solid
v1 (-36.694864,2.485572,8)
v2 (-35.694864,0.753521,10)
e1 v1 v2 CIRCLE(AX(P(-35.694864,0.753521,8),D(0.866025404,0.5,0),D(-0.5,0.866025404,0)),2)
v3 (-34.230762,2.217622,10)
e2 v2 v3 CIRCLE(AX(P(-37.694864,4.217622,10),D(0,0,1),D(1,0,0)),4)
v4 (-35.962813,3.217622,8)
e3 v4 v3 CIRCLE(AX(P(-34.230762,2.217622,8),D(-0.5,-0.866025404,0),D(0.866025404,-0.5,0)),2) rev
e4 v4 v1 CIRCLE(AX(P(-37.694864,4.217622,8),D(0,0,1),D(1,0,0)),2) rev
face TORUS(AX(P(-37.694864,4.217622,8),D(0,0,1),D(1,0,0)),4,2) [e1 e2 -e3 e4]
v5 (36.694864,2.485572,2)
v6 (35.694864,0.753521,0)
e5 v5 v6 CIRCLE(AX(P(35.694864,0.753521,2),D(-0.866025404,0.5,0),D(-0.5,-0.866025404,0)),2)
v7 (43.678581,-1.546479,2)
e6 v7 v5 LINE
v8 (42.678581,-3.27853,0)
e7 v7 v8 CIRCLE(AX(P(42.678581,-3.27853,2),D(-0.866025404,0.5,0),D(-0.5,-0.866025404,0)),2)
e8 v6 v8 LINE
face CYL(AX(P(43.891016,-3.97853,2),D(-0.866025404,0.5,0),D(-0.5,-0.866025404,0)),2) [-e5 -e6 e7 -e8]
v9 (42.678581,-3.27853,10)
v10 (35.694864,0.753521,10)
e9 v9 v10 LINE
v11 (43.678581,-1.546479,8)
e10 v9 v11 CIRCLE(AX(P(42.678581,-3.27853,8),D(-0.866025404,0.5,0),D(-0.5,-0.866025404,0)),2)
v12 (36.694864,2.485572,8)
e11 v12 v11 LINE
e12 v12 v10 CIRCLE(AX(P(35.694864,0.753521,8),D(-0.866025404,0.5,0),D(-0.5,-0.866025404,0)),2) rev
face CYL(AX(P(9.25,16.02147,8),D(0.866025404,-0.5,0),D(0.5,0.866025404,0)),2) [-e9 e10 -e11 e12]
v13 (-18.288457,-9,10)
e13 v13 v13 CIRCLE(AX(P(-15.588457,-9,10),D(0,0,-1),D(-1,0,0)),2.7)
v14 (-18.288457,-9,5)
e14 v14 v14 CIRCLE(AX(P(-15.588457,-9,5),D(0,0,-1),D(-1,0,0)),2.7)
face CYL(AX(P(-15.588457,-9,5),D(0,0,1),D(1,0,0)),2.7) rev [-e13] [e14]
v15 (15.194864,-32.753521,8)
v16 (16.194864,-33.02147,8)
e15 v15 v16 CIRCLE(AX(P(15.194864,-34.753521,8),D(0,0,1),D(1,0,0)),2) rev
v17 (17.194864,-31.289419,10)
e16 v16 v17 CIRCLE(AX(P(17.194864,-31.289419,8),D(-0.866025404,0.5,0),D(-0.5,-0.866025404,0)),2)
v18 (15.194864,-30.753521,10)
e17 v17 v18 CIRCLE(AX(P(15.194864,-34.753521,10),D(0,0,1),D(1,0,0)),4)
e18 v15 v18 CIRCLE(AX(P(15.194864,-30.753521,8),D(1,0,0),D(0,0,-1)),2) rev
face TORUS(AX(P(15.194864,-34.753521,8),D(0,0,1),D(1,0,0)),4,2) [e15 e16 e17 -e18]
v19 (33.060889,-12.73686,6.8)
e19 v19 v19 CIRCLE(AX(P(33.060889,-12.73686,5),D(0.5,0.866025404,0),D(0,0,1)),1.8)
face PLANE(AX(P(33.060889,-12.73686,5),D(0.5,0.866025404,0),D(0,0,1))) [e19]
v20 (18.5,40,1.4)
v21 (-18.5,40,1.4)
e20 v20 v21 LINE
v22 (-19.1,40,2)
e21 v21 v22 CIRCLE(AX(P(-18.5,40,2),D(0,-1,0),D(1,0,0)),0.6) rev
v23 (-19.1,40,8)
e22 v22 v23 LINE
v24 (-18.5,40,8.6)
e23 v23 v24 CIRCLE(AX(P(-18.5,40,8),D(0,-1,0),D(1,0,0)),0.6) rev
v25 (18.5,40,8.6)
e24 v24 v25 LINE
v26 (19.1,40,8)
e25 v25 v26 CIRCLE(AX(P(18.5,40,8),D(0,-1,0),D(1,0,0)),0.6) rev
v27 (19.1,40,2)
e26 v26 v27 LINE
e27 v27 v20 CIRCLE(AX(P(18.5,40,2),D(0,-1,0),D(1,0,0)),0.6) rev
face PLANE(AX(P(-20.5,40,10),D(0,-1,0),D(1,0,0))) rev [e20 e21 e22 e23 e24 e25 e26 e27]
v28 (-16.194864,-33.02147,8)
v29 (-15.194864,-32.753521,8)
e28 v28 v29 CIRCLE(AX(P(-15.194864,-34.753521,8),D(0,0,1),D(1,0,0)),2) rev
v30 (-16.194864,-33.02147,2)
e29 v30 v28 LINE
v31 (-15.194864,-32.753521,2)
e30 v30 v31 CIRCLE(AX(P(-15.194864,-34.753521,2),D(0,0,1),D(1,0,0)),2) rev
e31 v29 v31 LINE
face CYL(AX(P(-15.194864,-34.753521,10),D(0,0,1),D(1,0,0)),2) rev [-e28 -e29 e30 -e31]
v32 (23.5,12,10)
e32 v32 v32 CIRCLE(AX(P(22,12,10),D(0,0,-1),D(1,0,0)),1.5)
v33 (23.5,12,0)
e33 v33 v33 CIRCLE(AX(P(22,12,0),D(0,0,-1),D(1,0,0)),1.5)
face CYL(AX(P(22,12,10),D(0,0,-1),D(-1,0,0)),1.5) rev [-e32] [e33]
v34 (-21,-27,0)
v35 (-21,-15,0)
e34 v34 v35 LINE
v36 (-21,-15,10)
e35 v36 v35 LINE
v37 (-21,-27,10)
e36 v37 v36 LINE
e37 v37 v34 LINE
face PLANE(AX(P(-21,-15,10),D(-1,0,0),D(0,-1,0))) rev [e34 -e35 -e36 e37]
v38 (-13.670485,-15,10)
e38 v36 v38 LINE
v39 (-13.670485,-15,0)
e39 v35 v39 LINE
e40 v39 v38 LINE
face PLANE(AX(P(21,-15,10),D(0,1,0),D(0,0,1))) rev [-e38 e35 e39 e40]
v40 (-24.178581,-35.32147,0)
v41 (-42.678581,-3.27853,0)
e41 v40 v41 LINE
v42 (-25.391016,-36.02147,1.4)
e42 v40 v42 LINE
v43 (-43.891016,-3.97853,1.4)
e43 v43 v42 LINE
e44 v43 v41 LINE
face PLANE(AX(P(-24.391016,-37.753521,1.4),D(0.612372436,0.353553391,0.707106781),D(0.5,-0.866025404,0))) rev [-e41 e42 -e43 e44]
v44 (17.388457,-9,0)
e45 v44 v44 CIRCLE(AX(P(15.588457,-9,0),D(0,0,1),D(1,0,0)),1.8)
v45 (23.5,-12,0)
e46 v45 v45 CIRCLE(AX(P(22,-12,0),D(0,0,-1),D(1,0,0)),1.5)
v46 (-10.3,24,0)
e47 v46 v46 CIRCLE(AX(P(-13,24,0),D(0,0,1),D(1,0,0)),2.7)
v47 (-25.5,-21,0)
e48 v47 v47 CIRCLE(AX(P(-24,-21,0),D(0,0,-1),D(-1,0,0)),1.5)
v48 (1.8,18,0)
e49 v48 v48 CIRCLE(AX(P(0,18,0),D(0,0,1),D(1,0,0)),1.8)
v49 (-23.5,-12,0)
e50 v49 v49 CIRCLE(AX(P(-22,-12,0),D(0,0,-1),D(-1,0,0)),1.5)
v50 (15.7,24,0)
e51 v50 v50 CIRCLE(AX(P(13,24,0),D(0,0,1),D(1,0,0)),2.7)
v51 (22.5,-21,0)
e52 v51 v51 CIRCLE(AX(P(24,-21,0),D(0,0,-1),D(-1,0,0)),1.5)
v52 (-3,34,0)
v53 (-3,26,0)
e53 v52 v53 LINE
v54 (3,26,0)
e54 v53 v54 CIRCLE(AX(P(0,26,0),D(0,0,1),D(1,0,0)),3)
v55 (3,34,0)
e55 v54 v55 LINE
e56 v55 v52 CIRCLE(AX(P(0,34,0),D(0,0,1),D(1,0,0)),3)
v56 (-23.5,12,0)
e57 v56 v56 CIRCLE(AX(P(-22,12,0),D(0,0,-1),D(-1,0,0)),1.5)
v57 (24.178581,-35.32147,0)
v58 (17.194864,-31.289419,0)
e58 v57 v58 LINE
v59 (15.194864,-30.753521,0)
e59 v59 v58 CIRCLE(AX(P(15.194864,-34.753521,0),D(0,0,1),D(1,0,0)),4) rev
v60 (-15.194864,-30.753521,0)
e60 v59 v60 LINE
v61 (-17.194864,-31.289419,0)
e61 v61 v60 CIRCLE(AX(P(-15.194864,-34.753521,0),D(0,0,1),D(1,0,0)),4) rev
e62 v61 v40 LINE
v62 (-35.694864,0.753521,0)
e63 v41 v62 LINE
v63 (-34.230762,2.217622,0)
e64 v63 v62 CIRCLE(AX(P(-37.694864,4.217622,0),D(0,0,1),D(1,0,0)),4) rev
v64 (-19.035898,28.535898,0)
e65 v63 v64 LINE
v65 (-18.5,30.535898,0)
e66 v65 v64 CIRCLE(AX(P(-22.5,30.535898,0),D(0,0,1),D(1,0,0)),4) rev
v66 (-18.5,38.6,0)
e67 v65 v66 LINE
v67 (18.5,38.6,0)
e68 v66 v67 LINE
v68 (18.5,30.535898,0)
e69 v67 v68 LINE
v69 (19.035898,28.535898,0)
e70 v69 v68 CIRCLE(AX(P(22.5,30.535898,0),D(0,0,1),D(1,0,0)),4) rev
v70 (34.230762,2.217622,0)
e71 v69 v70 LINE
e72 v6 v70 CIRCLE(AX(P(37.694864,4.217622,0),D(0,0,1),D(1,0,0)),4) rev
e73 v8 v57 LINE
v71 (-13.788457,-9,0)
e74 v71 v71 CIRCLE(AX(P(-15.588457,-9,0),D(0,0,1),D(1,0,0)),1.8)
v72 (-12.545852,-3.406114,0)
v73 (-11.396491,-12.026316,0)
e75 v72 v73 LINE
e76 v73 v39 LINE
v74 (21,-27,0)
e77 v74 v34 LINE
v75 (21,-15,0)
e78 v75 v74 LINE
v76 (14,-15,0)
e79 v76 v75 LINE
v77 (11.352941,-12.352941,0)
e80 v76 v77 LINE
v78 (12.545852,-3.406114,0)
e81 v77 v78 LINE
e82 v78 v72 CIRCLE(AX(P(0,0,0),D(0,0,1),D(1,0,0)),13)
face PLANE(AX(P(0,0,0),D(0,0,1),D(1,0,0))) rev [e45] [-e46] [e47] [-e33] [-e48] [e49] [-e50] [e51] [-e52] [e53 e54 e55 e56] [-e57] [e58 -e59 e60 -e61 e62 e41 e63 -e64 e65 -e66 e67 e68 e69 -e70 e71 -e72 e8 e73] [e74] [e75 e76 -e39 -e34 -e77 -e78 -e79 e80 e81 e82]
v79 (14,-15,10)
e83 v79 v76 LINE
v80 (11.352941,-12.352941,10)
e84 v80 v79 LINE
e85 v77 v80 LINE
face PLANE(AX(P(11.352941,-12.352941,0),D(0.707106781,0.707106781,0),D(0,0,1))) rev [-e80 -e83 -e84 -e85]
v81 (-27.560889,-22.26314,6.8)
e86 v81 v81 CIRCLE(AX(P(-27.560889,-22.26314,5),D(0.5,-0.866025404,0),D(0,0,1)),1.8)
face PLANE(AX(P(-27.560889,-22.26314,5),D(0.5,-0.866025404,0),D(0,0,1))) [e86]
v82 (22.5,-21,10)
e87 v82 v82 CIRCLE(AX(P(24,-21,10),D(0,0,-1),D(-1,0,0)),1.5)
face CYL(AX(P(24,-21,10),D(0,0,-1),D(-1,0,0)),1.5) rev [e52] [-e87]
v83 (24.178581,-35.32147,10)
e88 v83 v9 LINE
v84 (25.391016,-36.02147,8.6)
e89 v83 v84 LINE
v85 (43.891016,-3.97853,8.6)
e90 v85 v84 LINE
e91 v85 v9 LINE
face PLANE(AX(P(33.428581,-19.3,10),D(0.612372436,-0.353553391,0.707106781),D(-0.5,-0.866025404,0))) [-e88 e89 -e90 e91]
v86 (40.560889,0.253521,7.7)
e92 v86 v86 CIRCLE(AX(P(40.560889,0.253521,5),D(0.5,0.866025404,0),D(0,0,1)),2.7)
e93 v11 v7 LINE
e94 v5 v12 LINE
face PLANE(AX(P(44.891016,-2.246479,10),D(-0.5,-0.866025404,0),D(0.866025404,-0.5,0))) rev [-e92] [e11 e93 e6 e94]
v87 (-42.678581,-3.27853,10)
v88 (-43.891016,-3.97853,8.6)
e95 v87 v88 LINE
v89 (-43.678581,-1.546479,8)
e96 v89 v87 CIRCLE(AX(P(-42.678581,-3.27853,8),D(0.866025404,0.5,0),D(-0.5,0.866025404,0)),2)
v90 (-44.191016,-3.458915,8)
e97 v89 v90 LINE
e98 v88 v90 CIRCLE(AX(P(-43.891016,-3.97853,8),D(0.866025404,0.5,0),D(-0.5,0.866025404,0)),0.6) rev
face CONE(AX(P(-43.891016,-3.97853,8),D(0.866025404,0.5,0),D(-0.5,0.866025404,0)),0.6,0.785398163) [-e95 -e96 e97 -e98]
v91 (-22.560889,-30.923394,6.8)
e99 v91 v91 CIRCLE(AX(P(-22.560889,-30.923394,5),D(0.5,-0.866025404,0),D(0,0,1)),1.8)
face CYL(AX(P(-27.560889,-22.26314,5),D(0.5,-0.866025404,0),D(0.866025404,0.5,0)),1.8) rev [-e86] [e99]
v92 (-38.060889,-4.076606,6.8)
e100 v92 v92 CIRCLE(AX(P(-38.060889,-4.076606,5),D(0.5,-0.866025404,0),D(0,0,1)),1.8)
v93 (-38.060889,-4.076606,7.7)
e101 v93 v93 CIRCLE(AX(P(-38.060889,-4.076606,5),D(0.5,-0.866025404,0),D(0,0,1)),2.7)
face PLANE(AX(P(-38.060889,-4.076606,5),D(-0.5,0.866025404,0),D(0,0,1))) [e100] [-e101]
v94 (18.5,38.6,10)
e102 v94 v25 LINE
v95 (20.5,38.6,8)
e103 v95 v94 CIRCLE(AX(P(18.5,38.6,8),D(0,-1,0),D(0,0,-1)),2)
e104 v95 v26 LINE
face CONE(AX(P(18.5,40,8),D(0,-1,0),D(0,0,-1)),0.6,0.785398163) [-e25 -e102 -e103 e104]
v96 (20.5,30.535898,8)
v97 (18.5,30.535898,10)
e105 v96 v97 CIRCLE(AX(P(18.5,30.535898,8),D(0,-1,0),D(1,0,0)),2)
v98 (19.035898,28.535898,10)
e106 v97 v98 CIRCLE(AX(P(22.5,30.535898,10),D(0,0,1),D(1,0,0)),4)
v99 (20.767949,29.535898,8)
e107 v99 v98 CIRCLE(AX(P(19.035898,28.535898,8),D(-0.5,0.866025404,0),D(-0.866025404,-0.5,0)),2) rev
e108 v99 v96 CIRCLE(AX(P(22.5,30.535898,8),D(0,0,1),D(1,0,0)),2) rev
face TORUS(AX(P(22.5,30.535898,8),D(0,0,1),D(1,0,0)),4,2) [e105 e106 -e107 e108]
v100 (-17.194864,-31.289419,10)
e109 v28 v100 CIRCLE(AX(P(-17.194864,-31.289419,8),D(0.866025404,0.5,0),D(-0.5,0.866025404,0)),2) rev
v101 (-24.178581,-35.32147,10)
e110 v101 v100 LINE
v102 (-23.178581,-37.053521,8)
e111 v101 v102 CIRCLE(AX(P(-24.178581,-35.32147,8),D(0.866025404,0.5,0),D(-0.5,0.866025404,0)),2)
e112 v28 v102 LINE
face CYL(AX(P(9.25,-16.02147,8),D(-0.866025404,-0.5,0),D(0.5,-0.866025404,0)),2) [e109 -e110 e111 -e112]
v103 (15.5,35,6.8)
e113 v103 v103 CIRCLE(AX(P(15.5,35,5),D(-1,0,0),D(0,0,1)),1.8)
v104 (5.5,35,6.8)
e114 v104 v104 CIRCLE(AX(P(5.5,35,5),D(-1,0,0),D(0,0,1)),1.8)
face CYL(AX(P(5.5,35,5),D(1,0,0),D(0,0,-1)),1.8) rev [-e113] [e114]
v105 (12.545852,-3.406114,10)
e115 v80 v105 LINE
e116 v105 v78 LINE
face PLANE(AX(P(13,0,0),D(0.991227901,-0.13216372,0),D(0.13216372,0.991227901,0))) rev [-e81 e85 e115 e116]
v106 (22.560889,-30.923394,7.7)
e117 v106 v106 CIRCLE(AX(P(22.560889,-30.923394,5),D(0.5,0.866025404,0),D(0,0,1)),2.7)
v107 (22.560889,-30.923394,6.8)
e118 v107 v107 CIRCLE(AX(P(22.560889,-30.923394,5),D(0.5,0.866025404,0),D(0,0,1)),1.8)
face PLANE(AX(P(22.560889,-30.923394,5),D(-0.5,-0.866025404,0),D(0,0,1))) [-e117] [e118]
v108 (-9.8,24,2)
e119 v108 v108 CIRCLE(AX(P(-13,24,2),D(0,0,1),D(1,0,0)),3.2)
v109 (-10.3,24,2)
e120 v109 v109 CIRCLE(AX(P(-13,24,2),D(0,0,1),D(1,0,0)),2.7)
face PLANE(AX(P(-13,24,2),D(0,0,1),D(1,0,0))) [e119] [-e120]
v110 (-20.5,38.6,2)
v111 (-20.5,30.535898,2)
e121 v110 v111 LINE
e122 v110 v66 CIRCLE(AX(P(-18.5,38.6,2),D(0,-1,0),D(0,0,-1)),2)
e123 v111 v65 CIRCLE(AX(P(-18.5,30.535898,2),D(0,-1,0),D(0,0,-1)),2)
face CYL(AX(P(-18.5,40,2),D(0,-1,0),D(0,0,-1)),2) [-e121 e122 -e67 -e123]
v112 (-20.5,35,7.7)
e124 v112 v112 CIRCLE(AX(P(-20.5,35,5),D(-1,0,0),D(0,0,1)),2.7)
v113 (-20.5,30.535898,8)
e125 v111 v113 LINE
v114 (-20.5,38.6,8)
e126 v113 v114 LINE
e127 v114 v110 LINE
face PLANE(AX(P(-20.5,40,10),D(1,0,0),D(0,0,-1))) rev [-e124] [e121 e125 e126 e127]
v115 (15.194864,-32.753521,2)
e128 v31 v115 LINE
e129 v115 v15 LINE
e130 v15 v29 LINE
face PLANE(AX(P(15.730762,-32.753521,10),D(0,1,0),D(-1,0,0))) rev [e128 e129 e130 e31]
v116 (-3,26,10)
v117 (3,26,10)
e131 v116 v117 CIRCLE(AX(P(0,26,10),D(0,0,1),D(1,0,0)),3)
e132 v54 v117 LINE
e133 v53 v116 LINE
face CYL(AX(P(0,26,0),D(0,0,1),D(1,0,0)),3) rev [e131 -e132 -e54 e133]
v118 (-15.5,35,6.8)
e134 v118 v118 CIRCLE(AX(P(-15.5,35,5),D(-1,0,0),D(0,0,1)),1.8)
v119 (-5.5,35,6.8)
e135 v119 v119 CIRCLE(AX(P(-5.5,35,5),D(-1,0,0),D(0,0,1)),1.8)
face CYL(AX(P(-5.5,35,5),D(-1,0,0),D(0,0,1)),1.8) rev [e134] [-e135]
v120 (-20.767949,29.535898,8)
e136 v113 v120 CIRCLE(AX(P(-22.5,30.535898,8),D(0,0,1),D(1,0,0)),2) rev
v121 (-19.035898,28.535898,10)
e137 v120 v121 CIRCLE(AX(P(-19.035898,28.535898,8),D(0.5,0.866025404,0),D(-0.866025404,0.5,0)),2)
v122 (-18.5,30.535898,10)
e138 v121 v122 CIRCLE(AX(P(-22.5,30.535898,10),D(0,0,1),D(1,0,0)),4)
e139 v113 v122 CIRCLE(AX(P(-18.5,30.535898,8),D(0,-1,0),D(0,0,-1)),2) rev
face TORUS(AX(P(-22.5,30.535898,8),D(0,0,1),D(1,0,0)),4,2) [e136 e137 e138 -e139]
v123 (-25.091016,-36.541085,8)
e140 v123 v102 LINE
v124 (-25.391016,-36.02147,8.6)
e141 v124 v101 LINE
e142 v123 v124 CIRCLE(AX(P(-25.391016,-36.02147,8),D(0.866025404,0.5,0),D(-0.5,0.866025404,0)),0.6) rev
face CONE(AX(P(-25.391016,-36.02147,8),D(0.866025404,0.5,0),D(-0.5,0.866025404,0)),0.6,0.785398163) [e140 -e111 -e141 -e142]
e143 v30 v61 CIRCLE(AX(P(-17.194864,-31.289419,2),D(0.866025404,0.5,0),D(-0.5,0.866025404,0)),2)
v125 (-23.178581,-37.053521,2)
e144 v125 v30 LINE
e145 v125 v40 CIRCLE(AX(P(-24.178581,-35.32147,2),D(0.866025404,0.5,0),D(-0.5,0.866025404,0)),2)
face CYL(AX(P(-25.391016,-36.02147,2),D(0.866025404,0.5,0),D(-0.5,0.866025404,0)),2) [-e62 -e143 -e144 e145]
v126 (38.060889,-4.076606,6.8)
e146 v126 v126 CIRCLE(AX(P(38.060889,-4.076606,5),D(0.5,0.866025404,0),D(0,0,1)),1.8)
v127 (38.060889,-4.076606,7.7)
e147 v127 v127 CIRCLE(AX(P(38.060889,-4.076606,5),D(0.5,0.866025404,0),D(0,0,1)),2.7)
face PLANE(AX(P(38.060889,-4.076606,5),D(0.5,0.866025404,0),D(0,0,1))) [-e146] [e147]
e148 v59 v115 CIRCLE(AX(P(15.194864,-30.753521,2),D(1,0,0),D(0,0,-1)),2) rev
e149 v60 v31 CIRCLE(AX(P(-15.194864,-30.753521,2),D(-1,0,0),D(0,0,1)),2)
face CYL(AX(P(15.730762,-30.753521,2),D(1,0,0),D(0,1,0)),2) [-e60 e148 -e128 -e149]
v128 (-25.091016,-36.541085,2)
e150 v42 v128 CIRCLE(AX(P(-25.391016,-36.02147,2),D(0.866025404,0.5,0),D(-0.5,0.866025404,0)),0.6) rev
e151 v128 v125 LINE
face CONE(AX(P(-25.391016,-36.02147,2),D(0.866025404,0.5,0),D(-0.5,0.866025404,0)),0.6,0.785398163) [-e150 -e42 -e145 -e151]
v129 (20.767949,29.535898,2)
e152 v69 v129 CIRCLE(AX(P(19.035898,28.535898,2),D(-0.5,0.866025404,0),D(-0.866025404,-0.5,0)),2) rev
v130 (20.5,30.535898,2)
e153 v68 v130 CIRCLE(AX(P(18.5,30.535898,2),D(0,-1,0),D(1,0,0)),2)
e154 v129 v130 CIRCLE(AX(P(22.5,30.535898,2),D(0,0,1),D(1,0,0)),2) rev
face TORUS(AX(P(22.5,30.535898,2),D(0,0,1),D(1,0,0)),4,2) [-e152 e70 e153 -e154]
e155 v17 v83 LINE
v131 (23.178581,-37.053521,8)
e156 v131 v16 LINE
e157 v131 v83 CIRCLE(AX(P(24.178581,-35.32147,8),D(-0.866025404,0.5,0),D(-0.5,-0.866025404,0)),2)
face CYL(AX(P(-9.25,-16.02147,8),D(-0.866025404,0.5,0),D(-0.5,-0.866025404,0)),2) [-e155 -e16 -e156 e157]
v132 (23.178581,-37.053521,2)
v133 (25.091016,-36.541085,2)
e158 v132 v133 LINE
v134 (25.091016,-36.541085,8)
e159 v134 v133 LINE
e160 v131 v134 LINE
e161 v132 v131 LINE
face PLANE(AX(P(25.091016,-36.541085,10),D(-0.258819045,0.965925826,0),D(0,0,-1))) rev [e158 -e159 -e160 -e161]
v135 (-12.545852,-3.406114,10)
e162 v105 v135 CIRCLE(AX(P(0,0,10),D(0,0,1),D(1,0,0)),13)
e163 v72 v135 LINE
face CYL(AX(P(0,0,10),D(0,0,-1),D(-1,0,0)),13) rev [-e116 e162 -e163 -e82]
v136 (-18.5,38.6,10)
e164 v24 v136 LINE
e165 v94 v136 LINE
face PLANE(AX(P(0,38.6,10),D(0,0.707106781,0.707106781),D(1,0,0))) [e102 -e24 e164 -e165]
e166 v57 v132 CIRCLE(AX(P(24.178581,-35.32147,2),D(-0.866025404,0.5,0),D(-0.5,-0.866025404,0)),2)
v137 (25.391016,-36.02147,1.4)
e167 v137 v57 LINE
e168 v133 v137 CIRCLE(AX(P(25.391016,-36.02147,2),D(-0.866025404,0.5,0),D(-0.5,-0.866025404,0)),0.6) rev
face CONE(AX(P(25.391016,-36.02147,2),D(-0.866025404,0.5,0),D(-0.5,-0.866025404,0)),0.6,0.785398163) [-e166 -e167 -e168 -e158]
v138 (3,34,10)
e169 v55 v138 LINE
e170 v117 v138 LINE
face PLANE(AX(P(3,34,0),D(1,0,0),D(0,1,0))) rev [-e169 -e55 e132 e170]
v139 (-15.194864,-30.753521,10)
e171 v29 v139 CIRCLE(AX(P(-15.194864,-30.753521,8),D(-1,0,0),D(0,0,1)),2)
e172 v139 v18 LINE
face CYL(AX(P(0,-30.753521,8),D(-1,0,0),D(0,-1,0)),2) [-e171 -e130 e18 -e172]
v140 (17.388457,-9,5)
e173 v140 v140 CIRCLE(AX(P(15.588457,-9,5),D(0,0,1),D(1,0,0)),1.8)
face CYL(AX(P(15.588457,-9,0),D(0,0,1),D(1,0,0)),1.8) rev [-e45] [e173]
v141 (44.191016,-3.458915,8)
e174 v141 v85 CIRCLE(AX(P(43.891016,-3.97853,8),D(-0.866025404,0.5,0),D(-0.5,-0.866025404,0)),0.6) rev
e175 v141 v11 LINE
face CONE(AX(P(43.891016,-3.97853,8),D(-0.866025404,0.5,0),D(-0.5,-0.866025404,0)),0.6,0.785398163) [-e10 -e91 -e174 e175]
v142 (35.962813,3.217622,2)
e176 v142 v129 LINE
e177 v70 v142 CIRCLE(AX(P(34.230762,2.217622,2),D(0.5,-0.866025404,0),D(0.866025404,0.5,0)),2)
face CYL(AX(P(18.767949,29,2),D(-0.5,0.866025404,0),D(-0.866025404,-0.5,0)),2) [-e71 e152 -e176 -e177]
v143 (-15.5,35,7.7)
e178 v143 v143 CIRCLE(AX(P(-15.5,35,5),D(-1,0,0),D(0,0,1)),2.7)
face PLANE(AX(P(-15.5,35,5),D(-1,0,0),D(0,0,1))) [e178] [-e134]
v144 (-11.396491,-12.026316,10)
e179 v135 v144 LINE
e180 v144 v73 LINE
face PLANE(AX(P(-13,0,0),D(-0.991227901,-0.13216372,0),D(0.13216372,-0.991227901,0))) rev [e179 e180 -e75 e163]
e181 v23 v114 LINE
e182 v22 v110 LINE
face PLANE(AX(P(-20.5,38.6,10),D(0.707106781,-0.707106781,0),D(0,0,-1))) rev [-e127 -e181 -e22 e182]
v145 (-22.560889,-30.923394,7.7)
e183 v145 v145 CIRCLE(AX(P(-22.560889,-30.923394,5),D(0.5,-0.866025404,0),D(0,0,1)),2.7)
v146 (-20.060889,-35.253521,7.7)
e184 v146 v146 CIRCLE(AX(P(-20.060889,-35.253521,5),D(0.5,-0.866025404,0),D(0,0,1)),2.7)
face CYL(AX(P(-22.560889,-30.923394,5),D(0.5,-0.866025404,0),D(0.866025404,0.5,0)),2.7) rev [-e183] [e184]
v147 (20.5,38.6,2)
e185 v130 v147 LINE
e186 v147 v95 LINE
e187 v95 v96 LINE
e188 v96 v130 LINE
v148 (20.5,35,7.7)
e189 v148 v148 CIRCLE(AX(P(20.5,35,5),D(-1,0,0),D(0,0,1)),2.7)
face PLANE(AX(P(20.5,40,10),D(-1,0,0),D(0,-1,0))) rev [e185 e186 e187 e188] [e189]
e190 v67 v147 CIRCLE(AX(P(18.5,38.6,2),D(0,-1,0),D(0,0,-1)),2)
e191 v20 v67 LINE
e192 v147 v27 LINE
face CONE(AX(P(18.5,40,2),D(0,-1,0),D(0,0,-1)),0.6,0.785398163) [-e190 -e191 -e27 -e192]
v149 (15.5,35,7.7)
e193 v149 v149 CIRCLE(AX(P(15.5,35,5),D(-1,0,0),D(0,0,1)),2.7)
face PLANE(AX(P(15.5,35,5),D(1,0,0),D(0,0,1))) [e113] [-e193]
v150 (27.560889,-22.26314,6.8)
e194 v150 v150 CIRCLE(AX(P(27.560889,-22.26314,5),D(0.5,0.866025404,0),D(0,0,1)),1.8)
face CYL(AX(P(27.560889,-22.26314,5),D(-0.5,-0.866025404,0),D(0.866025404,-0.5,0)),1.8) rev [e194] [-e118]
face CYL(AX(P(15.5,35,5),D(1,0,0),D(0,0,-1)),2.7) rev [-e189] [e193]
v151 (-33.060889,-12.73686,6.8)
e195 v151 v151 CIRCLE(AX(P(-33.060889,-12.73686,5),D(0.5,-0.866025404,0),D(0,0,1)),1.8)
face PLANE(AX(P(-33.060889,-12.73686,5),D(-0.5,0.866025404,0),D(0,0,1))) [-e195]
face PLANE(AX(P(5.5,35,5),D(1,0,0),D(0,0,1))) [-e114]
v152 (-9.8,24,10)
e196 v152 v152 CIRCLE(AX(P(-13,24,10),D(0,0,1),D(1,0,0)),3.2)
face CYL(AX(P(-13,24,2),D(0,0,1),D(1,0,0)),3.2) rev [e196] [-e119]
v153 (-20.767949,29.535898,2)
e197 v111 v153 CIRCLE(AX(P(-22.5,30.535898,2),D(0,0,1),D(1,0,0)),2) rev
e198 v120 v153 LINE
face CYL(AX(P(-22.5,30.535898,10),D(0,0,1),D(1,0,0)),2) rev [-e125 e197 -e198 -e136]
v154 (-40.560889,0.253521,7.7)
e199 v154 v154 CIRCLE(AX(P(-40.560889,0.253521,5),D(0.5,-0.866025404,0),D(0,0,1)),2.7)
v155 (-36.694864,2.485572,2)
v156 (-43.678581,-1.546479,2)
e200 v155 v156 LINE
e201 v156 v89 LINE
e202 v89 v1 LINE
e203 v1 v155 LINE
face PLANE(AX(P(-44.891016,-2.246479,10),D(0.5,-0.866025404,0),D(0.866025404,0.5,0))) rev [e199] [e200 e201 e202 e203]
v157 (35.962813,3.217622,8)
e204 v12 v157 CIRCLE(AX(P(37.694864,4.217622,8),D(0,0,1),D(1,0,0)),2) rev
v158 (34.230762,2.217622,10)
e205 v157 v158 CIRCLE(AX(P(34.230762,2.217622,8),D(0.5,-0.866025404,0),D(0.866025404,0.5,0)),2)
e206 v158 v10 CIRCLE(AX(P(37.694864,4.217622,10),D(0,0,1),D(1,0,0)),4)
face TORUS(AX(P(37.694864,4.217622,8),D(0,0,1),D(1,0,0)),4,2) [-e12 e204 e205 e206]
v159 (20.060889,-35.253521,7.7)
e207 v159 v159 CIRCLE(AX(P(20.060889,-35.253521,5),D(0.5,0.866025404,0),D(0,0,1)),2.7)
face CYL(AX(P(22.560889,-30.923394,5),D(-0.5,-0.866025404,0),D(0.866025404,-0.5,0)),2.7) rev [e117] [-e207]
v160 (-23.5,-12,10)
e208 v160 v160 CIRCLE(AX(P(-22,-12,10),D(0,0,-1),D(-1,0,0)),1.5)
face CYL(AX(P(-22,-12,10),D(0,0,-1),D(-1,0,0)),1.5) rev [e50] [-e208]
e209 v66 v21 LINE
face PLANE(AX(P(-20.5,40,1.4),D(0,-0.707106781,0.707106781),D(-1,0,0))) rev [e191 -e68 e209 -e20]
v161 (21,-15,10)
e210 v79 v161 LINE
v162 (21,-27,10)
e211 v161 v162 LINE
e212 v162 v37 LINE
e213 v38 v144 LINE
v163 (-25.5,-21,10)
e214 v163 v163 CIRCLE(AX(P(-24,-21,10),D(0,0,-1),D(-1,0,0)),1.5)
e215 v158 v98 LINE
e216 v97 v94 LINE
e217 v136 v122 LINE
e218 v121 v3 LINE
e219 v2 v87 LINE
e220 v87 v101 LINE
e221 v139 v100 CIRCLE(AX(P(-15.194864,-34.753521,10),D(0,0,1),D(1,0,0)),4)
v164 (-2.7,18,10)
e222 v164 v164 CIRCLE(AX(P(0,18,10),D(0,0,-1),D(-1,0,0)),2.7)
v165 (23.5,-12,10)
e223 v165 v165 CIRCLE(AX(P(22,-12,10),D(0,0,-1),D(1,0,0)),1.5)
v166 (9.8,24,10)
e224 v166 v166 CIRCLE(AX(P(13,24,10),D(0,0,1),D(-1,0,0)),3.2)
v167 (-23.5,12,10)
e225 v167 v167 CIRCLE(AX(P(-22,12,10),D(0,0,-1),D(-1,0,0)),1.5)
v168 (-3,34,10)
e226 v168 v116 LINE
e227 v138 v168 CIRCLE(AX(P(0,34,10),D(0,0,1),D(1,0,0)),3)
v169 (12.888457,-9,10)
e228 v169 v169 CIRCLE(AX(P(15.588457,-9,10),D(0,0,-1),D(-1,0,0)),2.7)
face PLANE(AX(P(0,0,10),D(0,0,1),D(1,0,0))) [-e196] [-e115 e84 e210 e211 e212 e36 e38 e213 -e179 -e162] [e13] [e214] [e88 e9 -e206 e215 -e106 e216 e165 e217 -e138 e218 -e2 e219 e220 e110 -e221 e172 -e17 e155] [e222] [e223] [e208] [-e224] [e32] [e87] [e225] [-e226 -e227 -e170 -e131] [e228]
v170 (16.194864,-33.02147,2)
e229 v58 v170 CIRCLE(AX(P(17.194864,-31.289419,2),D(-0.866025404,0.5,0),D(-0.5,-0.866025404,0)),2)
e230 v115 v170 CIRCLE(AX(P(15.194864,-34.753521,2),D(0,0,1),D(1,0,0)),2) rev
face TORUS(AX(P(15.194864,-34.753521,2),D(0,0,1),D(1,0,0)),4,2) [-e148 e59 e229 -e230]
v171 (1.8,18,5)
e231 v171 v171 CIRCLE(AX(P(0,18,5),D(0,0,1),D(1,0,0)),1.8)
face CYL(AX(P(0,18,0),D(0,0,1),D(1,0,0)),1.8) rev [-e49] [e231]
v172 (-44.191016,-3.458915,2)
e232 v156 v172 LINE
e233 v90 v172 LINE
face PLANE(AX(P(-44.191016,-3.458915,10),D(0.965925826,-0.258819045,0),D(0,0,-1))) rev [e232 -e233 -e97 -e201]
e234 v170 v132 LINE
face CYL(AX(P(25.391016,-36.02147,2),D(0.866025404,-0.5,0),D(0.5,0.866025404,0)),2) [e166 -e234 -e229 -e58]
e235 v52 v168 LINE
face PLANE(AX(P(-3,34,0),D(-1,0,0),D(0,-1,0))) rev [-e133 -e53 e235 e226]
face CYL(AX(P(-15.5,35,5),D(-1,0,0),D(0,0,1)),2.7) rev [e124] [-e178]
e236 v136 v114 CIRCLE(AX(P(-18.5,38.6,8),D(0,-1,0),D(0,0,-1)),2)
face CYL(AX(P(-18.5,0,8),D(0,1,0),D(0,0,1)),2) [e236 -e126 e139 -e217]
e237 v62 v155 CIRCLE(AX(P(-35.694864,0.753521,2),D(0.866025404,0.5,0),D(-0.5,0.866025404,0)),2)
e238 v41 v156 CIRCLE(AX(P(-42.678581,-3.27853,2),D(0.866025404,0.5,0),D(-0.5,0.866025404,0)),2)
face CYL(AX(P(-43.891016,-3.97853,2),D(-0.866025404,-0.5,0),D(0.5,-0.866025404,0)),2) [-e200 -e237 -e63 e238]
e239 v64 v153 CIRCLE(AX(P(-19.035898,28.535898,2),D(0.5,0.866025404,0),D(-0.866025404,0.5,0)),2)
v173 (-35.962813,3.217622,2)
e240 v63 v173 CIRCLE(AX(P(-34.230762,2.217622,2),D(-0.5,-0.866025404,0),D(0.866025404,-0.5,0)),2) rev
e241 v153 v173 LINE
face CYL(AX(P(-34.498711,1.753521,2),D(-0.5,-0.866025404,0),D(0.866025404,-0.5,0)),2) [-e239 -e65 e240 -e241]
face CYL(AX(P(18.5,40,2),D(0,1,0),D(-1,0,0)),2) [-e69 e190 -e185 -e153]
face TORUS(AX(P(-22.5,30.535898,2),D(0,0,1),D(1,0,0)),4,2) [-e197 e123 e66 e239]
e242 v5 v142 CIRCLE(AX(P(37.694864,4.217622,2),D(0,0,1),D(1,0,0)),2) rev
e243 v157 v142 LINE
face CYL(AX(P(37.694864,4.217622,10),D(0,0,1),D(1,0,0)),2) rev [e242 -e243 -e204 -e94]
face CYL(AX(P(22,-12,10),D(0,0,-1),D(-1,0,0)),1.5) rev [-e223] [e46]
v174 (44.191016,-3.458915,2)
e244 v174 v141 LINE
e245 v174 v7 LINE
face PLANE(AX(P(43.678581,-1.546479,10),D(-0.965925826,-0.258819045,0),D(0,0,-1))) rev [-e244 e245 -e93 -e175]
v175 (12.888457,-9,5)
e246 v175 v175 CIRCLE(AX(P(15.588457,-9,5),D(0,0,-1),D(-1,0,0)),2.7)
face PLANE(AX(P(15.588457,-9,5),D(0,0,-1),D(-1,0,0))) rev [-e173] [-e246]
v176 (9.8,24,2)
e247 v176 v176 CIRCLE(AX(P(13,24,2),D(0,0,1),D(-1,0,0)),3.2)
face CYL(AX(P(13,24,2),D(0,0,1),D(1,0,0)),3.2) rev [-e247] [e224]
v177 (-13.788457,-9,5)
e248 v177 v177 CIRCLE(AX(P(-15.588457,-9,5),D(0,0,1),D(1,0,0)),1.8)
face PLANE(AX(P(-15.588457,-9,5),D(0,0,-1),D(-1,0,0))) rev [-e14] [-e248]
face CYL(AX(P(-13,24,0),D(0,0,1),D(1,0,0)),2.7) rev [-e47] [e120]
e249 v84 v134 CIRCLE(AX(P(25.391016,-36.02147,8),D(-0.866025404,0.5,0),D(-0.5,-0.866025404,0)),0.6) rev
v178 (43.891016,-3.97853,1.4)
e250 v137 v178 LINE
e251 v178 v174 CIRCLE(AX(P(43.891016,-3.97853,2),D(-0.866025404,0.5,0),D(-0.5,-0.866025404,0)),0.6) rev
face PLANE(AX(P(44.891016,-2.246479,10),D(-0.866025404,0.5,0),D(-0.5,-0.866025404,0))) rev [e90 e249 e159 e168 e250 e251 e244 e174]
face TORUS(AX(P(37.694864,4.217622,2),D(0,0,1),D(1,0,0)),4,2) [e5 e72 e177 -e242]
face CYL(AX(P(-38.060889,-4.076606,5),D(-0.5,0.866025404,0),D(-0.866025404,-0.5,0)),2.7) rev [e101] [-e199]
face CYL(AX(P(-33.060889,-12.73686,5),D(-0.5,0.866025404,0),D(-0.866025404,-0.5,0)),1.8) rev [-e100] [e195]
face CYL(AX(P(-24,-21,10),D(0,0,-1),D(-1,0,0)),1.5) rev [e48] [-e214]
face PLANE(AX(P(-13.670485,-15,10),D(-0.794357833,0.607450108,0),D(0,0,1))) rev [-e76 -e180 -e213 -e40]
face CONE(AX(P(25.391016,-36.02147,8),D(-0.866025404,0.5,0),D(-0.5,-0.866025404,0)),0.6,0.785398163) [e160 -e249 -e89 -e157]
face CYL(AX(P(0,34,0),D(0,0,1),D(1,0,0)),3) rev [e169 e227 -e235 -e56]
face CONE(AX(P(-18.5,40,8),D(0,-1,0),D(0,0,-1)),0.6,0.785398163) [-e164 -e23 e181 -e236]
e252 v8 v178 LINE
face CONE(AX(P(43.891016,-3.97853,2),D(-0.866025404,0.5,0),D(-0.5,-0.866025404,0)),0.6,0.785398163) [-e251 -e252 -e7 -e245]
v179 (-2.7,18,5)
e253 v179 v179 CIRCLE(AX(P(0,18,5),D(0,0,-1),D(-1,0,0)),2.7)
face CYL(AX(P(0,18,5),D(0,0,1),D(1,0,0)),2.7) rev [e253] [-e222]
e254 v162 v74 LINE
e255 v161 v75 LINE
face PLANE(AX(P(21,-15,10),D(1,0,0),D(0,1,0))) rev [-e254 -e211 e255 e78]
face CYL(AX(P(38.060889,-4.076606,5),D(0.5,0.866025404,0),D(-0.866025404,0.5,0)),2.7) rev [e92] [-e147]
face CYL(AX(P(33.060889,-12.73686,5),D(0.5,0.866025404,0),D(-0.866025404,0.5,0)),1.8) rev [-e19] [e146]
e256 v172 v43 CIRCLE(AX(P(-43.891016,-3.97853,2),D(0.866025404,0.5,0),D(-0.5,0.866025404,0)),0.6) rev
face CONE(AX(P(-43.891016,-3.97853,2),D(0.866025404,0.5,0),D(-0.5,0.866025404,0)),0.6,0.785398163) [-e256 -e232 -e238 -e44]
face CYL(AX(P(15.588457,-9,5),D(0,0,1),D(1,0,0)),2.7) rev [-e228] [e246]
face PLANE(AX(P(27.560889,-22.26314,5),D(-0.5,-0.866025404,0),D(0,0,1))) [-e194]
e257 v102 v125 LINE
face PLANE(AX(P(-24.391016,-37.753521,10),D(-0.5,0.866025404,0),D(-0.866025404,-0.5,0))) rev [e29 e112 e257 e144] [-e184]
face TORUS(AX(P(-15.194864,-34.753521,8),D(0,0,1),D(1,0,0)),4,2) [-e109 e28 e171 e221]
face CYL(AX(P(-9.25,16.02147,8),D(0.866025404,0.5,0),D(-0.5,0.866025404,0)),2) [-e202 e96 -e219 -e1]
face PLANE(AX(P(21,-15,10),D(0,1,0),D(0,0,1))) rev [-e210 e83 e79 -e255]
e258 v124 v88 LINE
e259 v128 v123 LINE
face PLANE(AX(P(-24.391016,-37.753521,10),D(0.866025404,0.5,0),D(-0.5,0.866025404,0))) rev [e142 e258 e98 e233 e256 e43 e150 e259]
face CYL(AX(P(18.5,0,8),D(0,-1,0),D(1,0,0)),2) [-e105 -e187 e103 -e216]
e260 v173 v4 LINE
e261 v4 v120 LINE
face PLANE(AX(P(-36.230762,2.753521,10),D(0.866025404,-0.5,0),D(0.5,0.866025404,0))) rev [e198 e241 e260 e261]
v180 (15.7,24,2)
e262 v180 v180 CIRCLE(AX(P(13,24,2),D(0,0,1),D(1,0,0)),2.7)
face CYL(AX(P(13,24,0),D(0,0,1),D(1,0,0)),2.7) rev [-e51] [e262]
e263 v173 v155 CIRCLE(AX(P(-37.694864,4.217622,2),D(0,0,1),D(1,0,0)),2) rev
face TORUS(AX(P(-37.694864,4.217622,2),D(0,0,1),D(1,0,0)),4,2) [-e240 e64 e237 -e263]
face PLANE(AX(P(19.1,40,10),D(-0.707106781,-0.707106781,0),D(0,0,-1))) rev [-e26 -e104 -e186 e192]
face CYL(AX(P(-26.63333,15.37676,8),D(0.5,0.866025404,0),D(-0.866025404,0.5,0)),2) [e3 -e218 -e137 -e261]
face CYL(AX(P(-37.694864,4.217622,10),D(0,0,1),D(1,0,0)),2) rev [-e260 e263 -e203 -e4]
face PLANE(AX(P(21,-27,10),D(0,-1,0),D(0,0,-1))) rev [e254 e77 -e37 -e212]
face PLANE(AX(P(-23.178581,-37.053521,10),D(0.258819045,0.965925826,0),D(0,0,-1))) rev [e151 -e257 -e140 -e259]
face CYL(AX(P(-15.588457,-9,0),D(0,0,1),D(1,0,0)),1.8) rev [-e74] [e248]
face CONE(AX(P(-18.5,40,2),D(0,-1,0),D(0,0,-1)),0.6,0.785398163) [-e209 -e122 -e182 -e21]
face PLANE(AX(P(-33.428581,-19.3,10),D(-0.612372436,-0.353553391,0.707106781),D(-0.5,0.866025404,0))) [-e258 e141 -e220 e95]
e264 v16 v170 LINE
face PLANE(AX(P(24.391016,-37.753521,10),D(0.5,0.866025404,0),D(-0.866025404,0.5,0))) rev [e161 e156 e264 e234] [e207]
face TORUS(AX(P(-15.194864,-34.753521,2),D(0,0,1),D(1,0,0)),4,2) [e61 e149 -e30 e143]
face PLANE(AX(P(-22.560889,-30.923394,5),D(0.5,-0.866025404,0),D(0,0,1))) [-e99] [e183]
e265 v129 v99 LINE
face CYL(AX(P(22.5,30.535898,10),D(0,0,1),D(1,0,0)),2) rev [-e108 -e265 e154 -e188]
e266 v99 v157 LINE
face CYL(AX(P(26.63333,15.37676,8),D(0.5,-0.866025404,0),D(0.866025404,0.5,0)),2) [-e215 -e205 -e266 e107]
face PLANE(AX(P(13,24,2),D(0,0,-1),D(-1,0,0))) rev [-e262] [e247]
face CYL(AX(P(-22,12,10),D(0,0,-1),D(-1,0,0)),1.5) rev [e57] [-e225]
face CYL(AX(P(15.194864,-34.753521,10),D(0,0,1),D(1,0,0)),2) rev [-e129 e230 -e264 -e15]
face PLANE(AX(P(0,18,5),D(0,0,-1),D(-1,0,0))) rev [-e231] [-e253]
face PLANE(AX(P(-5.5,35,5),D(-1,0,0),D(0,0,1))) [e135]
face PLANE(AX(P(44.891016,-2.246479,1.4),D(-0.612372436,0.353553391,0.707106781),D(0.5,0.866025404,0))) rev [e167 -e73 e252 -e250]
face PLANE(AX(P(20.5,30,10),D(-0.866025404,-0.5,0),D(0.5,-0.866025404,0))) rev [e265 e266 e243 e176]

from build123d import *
from OCP.BRepFilletAPI import BRepFilletAPI_MakeChamfer

# Parameters (mm, degrees)
SKETCH_1_R                         = 13
EXTRUDE_1_DEPTH                    = 10
SKETCH_2_R                         = 2.7
CUT_EXTRUDE_1_DEPTH                = 5
PATTERN_CIRCULAR_1_COUNT           = 3
PATTERN_CIRCULAR_1_COPY_1_SKETCH_R = 2.7
PATTERN_CIRCULAR_1_COPY_1_DEPTH    = 5
PATTERN_CIRCULAR_1_COPY_2_SKETCH_R = 2.7
PATTERN_CIRCULAR_1_COPY_2_DEPTH    = 5
SKETCH_3_R                         = 2.7
SKETCH_3_R_2                       = 2.699999999999997
SKETCH_3_R_3                       = 2.700000000000001
CUT_EXTRUDE_2_DEPTH                = 5
SKETCH_4_R                         = 1.5000000000000009
SKETCH_4_R_2                       = 1.5000000000000042
CUT_EXTRUDE_3_DEPTH                = 61.95246780158357
CUT_EXTRUDE_5_DEPTH                = 61.95246780158357
SKETCH_7_R                         = 3.2
SKETCH_7_R_2                       = 3.1999999999999984
CUT_EXTRUDE_6_DEPTH                = 8
CHAMFER_2_SIZE                     = 1.4
FILLET_2_R                         = 2
CHAMFER_3_SIZE                     = 1.4
SKETCH_9_R                         = 1.8000000000000005
SKETCH_9_R_2                       = 1.7999999999999987
SKETCH_9_R_3                       = 1.8
CUT_EXTRUDE_8_DEPTH                = 60.81513460321006
SKETCH_10_R                        = 1.8000000000000014
CUT_EXTRUDE_9_DEPTH                = 10
PATTERN_CIRCULAR_2_COUNT           = 3
PATTERN_CIRCULAR_2_COPY_1_SKETCH_R = 1.8000000000000014
PATTERN_CIRCULAR_2_COPY_1_DEPTH    = 10
PATTERN_CIRCULAR_2_COPY_2_SKETCH_R = 1.8000000000000014
PATTERN_CIRCULAR_2_COPY_2_DEPTH    = 10
SKETCH_11_R                        = 1.5000000000000009
CUT_EXTRUDE_10_DEPTH               = 61.43881474350847
SKETCH_12_R                        = 2.6999999999999993
CUT_EXTRUDE_11_DEPTH               = 61.140255466701646
CUT_EXTRUDE_12_DEPTH               = 61.43881474350847
CHAMFER_4_SIZE                     = 3
CHAMFER_4_SIZE2                    = 2.6704845794861627
CHAMFER_4_SIZE2_2                  = 2.670484579486165


with BuildPart() as part:
    # 草圖1 → 填料-伸長1 (new body)
    with BuildSketch(Plane.XY):
        Polygon((-20.49999999999998, 39.999999999999986), (20.49999999999997, 39.99999999999999), (20.499999999999982, 29.999999999999993), (36.23076211353136, 2.753520777584056), (44.891016151375794, -2.2464792224159686), (24.39101615137583, -37.753520777577926), (15.730762113531437, -32.75352077757793), (-15.730762113531332, -32.753520777577926), (-24.391016151375762, -37.75352077757796), (-44.891016151375766, -2.2464792224160335), (-36.23076211353138, 2.7535207775839847), (-20.49999999999998, 29.999999999999936), align=None)
        Circle(SKETCH_1_R, mode=Mode.SUBTRACT)
    extrude(amount=EXTRUDE_1_DEPTH)

    # 草圖2 → 除料-伸長1 (cut)
    with BuildSketch(Plane.ZY.offset(20.49999999999998)):
        with Locations((5, 34.999999999999964)):
            Circle(SKETCH_2_R)
    cut_extrude_1 = extrude(amount=-CUT_EXTRUDE_1_DEPTH, mode=Mode.SUBTRACT)

    # 鏡射1: 除料-伸長1 across plane
    add(cut_extrude_1.mirror(Plane(origin=(0, 0, 0), x_dir=(0, 0, 1), z_dir=(1, 0, 0))), mode=Mode.SUBTRACT)

    # 環狀複製排列1: 除料-伸長1 ×3 about axis
    pattern_circular_1_axis = Axis((1.45e-15, -5e-16, 0), (0, 0, 1))
    for i in range(1, PATTERN_CIRCULAR_1_COUNT):
        add(cut_extrude_1.rotate(pattern_circular_1_axis, i * 360 / PATTERN_CIRCULAR_1_COUNT), mode=Mode.SUBTRACT)

    # 環狀複製排列1 copy 1 sketch → 環狀複製排列1 copy 1 (cut)
    with BuildSketch(Plane(origin=(-10.249999999999982, 17.75352077758097, 0), x_dir=(0, 0, 1), z_dir=(-0.4999999999999998, 0.8660254037844387, 0))):
        with Locations((5, -34.999999999999964)):
            Circle(PATTERN_CIRCULAR_1_COPY_1_SKETCH_R)
    extrude(amount=-PATTERN_CIRCULAR_1_COPY_1_DEPTH, mode=Mode.SUBTRACT)

    # 環狀複製排列1 copy 2 sketch → 環狀複製排列1 copy 2 (cut)
    with BuildSketch(Plane(origin=(-10.249999999999996, -17.753520777580967, 0), x_dir=(0, 0, 1), z_dir=(-0.5000000000000004, -0.8660254037844384, 0))):
        with Locations((5, -34.999999999999964)):
            Circle(PATTERN_CIRCULAR_1_COPY_2_SKETCH_R)
    extrude(amount=-PATTERN_CIRCULAR_1_COPY_2_DEPTH, mode=Mode.SUBTRACT)

    # 草圖3 → 除料-伸長2 (cut)
    with BuildSketch(Plane(origin=(0, 0, 10), x_dir=(-1, 0, 0), z_dir=(0, 0, -1))):
        with Locations((2.04439e-12, 18)):
            Circle(SKETCH_3_R)
        with Locations((15.588457268121106, -9.000000000000483)):
            Circle(SKETCH_3_R_2)
        with Locations((-15.588457268118686, -8.999999999999522)):
            Circle(SKETCH_3_R_3)
    extrude(amount=CUT_EXTRUDE_2_DEPTH, mode=Mode.SUBTRACT)

    # 草圖4 → 除料-伸長3 (cut, through all)
    with BuildSketch(Plane(origin=(0, 0, 0), x_dir=(-1, 0, 0), z_dir=(0, 0, -1))):
        with Locations((22, -12)):
            Circle(SKETCH_4_R)
        with Locations((21.999999999999986, 12.000000000000002)):
            Circle(SKETCH_4_R)
        with Locations(Location((-21.999999999999986, 12.000000000000002, 0), (0, 0, 180))):
            Circle(SKETCH_4_R_2)
        with Locations(Location((-22, -12, 0), (0, 0, 180))):
            Circle(SKETCH_4_R)
    extrude(amount=-CUT_EXTRUDE_3_DEPTH, mode=Mode.SUBTRACT)

    # 草圖6 → 除料-伸長5 (cut, through all)
    with BuildSketch(Plane.XY.offset(10)):
        with BuildLine():
            Line((3, 34), (3.0000000000000013, 26))
            ThreePointArc((3.0000000000000013, 26), (1.8e-16, 23), (-2.9999999999999996, 26))
            Line((-2.9999999999999996, 26), (-3.000000000000001, 34))
            ThreePointArc((-3.000000000000001, 34), (-6e-17, 37), (3, 34))
        make_face()
    extrude(amount=-CUT_EXTRUDE_5_DEPTH, mode=Mode.SUBTRACT)

    # 草圖7 → 除料-伸長6 (cut)
    with BuildSketch(Plane.XY.offset(10)):
        with Locations((-13.000000000000004, 24)):
            Circle(SKETCH_7_R)
        with Locations(Location((12.999999999999996, 24.000000000000004, 0), (0, 0, 180))):
            Circle(SKETCH_7_R_2)
    extrude(amount=-CUT_EXTRUDE_6_DEPTH, mode=Mode.SUBTRACT)

    # 導角2
    chamfer_2_edges = [part.edges().sort_by_distance(p)[0] for p in [
        (-34.641016151375766, -19.999999999996998, 10),
        (-3.55e-15, 39.999999999999986, 0),
        (34.64101615137581, -19.999999999996945, 0),
        (-34.641016151375766, -19.999999999996998, 0),
        (34.64101615137581, -19.999999999996945, 10),
        (-3.55e-15, 39.999999999999986, 10),
    ]]
    chamfer(chamfer_2_edges, length=CHAMFER_2_SIZE)

    # 圓角2
    fillet_2_edges = [part.edges().sort_by_distance(p)[0] for p in [
        (39.95467134980447, 0.6035207775840439, 10),
        (39.95467134980447, 0.6035207775840439, 0),
        (20.49999999999998, 34.3, 10),
        (20.49999999999998, 34.29999999999999, 0),
        (-20.49999999999998, 34.29999999999996, 10),
        (-20.49999999999998, 34.29999999999996, 0),
        (-39.95467134980447, 0.6035207775839742, 10),
        (-39.95467134980447, 0.603520777583975, 0),
        (-19.454671349804443, -34.903520777577945, 10),
        (-19.454671349804443, -34.903520777577945, 0),
        (19.45467134980452, -34.903520777577924, 10),
        (19.45467134980452, -34.903520777577924, 0),
        (36.23076211353136, 2.753520777584056, 5),
        (28.36538105676567, 16.376760388792025, 10),
        (20.499999999999982, 29.999999999999993, 5),
        (28.36538105676567, 16.376760388792025, 0),
        (-20.49999999999998, 29.999999999999936, 5),
        (-28.365381056765678, 16.376760388791958, 10),
        (-36.23076211353138, 2.7535207775839847, 5),
        (-28.365381056765678, 16.376760388791958, 0),
        (-15.730762113531332, -32.753520777577926, 5),
        (5.329e-14, -32.75352077757793, 10),
        (15.730762113531437, -32.75352077757793, 5),
        (5.329e-14, -32.75352077757793, 0),
    ]]
    fillet(fillet_2_edges, radius=FILLET_2_R)

    # 導角3
    chamfer_3_edges = [part.edges().sort_by_distance(p)[0] for p in [
        (20.476835451633185, 39.99999999999999, 8.30351539856506),
        (20.476835451633185, 39.99999999999999, 1.6964846014349406),
        (20.49999999999997, 39.99999999999999, 5),
        (44.8794338771924, -2.266540309768801, 8.303515398565063),
        (44.8794338771924, -2.266540309768801, 1.6964846014349366),
        (44.891016151375794, -2.2464792224159686, 5),
        (24.402598425559223, -37.73345969022509, 8.303515398565105),
        (24.402598425559223, -37.73345969022509, 1.6964846014348944),
        (24.39101615137583, -37.753520777577926, 5),
        (-24.402598425559155, -37.73345969022514, 8.30351539856507),
        (-24.402598425559155, -37.73345969022514, 1.6964846014349295),
        (-24.391016151375762, -37.75352077757796, 5),
        (-44.879433877192376, -2.2665403097688666, 8.303515398565079),
        (-44.879433877192376, -2.2665403097688643, 1.6964846014349226),
        (-44.891016151375766, -2.2464792224160335, 5),
        (-20.476835451633193, 39.999999999999986, 8.303515398565068),
        (-20.476835451633193, 39.999999999999986, 1.696484601434932),
        (-20.49999999999998, 39.999999999999986, 5),
    ]]
    chamfer(chamfer_3_edges, length=CHAMFER_3_SIZE - 0.0001)  # a hair under: the kernel refuses the full size

    # 草圖9 → 除料-伸長8 (cut, through all)
    with BuildSketch(Plane.XY.offset(5)):
        with Locations((15.588457268118686, -8.999999999999522)):
            Circle(SKETCH_9_R)
        with Locations((-15.58845726811887, -8.999999999999208)):
            Circle(SKETCH_9_R_2)
        with Locations((1.8019e-13, 17.999999999998714)):
            Circle(SKETCH_9_R_3)
    extrude(amount=-CUT_EXTRUDE_8_DEPTH, mode=Mode.SUBTRACT)

    # 草圖10 → 除料-伸長9 (cut)
    with BuildSketch(Plane.ZY.offset(15.499999999999979)):
        with Locations((5, 34.999999999999964)):
            Circle(SKETCH_10_R)
    cut_extrude_9 = extrude(amount=-CUT_EXTRUDE_9_DEPTH, mode=Mode.SUBTRACT)

    # 鏡射2: 除料-伸長9 across plane
    add(cut_extrude_9.mirror(Plane(origin=(0, 0, 0), x_dir=(0, 0, 1), z_dir=(1, 0, 0))), mode=Mode.SUBTRACT)

    # 環狀複製排列2: 除料-伸長9 ×3 about axis
    pattern_circular_2_axis = Axis((5.8e-16, 1e-15, 0), (0, 0, 1))
    for i in range(1, PATTERN_CIRCULAR_2_COUNT):
        add(cut_extrude_9.rotate(pattern_circular_2_axis, i * 360 / PATTERN_CIRCULAR_2_COUNT), mode=Mode.SUBTRACT)

    # 環狀複製排列2 copy 1 sketch → 環狀複製排列2 copy 1 (cut)
    with BuildSketch(Plane(origin=(-7.749999999999984, 13.423393758658783, 0), x_dir=(0, 0, 1), z_dir=(-0.4999999999999998, 0.8660254037844387, 0))):
        with Locations((5, -34.999999999999964)):
            Circle(PATTERN_CIRCULAR_2_COPY_1_SKETCH_R)
    extrude(amount=-PATTERN_CIRCULAR_2_COPY_1_DEPTH, mode=Mode.SUBTRACT)

    # 環狀複製排列2 copy 2 sketch → 環狀複製排列2 copy 2 (cut)
    with BuildSketch(Plane(origin=(-7.7499999999999964, -13.423393758658774, 0), x_dir=(0, 0, 1), z_dir=(-0.5000000000000004, -0.8660254037844384, 0))):
        with Locations((5, -34.999999999999964)):
            Circle(PATTERN_CIRCULAR_2_COPY_2_SKETCH_R)
    extrude(amount=-PATTERN_CIRCULAR_2_COPY_2_DEPTH, mode=Mode.SUBTRACT)

    # 草圖11 → 除料-伸長10 (cut, through all)
    with BuildSketch(Plane(origin=(0, 0, 0), x_dir=(-1, 0, 0), z_dir=(0, 0, -1))):
        with Locations((24, -20.999999999999996)):
            Circle(SKETCH_11_R)
        with Locations((-24, -20.999999999999996)):
            Circle(SKETCH_11_R)
        Polygon((-21, -15), (21, -15), (20.999999999999996, -27), (-20.999999999999996, -27), align=None)
    extrude(amount=-CUT_EXTRUDE_10_DEPTH, mode=Mode.SUBTRACT)

    # 草圖12 → 除料-伸長11 (cut, through all)
    with BuildSketch(Plane.XY.offset(2)):
        with Locations((-13.000000000000004, 24)):
            Circle(SKETCH_12_R)
        with Locations((12.999999999999996, 24.000000000000004)):
            Circle(SKETCH_12_R)
    extrude(amount=-CUT_EXTRUDE_11_DEPTH, mode=Mode.SUBTRACT)

    # 草圖13 → 除料-伸長12 (cut, through all)
    with BuildSketch(Plane.XY.offset(10)):
        Polygon((-13.000000000000002, 0), (-11, -14.999999999999996), (10.999999999999986, -15.000000000000007), (13.000000000000002, -1.203e-14), align=None)
    extrude(amount=-CUT_EXTRUDE_12_DEPTH, mode=Mode.SUBTRACT)

    # 導角4: one chamfer whose edges measure the first distance from different faces: ONE call of the kernel's chamfer builder (chamfer() names one face for all edges)
    chamfer_4_edges_1 = [part.edges().sort_by_distance(p)[0] for p in [
        (10.999999999999986, -15.000000000000007, 5),
    ]]
    chamfer_4_side_1 = [part.faces().sort_by_distance(p)[0] for p in [
        (15.999999999999993, -15, 5),
    ]]
    chamfer_4_edges_2 = [part.edges().sort_by_distance(p)[0] for p in [
        (-11, -14.999999999999996, 5),
    ]]
    chamfer_4_side_2 = [part.faces().sort_by_distance(p)[0] for p in [
        (-11.772925764192141, -9.203056768558943, 5),
    ]]
    chamfer_4 = BRepFilletAPI_MakeChamfer(part.part.solid().wrapped)
    for e in chamfer_4_edges_1:
        chamfer_4.Add(CHAMFER_4_SIZE, CHAMFER_4_SIZE2, e.wrapped, chamfer_4_side_1[0].wrapped)  # the first distance lies on this face
    for e in chamfer_4_edges_2:
        chamfer_4.Add(CHAMFER_4_SIZE, CHAMFER_4_SIZE2_2, e.wrapped, chamfer_4_side_2[0].wrapped)  # the first distance lies on this face
    add(Compound.cast(chamfer_4.Shape()), mode=Mode.REPLACE)


solid = part.part
